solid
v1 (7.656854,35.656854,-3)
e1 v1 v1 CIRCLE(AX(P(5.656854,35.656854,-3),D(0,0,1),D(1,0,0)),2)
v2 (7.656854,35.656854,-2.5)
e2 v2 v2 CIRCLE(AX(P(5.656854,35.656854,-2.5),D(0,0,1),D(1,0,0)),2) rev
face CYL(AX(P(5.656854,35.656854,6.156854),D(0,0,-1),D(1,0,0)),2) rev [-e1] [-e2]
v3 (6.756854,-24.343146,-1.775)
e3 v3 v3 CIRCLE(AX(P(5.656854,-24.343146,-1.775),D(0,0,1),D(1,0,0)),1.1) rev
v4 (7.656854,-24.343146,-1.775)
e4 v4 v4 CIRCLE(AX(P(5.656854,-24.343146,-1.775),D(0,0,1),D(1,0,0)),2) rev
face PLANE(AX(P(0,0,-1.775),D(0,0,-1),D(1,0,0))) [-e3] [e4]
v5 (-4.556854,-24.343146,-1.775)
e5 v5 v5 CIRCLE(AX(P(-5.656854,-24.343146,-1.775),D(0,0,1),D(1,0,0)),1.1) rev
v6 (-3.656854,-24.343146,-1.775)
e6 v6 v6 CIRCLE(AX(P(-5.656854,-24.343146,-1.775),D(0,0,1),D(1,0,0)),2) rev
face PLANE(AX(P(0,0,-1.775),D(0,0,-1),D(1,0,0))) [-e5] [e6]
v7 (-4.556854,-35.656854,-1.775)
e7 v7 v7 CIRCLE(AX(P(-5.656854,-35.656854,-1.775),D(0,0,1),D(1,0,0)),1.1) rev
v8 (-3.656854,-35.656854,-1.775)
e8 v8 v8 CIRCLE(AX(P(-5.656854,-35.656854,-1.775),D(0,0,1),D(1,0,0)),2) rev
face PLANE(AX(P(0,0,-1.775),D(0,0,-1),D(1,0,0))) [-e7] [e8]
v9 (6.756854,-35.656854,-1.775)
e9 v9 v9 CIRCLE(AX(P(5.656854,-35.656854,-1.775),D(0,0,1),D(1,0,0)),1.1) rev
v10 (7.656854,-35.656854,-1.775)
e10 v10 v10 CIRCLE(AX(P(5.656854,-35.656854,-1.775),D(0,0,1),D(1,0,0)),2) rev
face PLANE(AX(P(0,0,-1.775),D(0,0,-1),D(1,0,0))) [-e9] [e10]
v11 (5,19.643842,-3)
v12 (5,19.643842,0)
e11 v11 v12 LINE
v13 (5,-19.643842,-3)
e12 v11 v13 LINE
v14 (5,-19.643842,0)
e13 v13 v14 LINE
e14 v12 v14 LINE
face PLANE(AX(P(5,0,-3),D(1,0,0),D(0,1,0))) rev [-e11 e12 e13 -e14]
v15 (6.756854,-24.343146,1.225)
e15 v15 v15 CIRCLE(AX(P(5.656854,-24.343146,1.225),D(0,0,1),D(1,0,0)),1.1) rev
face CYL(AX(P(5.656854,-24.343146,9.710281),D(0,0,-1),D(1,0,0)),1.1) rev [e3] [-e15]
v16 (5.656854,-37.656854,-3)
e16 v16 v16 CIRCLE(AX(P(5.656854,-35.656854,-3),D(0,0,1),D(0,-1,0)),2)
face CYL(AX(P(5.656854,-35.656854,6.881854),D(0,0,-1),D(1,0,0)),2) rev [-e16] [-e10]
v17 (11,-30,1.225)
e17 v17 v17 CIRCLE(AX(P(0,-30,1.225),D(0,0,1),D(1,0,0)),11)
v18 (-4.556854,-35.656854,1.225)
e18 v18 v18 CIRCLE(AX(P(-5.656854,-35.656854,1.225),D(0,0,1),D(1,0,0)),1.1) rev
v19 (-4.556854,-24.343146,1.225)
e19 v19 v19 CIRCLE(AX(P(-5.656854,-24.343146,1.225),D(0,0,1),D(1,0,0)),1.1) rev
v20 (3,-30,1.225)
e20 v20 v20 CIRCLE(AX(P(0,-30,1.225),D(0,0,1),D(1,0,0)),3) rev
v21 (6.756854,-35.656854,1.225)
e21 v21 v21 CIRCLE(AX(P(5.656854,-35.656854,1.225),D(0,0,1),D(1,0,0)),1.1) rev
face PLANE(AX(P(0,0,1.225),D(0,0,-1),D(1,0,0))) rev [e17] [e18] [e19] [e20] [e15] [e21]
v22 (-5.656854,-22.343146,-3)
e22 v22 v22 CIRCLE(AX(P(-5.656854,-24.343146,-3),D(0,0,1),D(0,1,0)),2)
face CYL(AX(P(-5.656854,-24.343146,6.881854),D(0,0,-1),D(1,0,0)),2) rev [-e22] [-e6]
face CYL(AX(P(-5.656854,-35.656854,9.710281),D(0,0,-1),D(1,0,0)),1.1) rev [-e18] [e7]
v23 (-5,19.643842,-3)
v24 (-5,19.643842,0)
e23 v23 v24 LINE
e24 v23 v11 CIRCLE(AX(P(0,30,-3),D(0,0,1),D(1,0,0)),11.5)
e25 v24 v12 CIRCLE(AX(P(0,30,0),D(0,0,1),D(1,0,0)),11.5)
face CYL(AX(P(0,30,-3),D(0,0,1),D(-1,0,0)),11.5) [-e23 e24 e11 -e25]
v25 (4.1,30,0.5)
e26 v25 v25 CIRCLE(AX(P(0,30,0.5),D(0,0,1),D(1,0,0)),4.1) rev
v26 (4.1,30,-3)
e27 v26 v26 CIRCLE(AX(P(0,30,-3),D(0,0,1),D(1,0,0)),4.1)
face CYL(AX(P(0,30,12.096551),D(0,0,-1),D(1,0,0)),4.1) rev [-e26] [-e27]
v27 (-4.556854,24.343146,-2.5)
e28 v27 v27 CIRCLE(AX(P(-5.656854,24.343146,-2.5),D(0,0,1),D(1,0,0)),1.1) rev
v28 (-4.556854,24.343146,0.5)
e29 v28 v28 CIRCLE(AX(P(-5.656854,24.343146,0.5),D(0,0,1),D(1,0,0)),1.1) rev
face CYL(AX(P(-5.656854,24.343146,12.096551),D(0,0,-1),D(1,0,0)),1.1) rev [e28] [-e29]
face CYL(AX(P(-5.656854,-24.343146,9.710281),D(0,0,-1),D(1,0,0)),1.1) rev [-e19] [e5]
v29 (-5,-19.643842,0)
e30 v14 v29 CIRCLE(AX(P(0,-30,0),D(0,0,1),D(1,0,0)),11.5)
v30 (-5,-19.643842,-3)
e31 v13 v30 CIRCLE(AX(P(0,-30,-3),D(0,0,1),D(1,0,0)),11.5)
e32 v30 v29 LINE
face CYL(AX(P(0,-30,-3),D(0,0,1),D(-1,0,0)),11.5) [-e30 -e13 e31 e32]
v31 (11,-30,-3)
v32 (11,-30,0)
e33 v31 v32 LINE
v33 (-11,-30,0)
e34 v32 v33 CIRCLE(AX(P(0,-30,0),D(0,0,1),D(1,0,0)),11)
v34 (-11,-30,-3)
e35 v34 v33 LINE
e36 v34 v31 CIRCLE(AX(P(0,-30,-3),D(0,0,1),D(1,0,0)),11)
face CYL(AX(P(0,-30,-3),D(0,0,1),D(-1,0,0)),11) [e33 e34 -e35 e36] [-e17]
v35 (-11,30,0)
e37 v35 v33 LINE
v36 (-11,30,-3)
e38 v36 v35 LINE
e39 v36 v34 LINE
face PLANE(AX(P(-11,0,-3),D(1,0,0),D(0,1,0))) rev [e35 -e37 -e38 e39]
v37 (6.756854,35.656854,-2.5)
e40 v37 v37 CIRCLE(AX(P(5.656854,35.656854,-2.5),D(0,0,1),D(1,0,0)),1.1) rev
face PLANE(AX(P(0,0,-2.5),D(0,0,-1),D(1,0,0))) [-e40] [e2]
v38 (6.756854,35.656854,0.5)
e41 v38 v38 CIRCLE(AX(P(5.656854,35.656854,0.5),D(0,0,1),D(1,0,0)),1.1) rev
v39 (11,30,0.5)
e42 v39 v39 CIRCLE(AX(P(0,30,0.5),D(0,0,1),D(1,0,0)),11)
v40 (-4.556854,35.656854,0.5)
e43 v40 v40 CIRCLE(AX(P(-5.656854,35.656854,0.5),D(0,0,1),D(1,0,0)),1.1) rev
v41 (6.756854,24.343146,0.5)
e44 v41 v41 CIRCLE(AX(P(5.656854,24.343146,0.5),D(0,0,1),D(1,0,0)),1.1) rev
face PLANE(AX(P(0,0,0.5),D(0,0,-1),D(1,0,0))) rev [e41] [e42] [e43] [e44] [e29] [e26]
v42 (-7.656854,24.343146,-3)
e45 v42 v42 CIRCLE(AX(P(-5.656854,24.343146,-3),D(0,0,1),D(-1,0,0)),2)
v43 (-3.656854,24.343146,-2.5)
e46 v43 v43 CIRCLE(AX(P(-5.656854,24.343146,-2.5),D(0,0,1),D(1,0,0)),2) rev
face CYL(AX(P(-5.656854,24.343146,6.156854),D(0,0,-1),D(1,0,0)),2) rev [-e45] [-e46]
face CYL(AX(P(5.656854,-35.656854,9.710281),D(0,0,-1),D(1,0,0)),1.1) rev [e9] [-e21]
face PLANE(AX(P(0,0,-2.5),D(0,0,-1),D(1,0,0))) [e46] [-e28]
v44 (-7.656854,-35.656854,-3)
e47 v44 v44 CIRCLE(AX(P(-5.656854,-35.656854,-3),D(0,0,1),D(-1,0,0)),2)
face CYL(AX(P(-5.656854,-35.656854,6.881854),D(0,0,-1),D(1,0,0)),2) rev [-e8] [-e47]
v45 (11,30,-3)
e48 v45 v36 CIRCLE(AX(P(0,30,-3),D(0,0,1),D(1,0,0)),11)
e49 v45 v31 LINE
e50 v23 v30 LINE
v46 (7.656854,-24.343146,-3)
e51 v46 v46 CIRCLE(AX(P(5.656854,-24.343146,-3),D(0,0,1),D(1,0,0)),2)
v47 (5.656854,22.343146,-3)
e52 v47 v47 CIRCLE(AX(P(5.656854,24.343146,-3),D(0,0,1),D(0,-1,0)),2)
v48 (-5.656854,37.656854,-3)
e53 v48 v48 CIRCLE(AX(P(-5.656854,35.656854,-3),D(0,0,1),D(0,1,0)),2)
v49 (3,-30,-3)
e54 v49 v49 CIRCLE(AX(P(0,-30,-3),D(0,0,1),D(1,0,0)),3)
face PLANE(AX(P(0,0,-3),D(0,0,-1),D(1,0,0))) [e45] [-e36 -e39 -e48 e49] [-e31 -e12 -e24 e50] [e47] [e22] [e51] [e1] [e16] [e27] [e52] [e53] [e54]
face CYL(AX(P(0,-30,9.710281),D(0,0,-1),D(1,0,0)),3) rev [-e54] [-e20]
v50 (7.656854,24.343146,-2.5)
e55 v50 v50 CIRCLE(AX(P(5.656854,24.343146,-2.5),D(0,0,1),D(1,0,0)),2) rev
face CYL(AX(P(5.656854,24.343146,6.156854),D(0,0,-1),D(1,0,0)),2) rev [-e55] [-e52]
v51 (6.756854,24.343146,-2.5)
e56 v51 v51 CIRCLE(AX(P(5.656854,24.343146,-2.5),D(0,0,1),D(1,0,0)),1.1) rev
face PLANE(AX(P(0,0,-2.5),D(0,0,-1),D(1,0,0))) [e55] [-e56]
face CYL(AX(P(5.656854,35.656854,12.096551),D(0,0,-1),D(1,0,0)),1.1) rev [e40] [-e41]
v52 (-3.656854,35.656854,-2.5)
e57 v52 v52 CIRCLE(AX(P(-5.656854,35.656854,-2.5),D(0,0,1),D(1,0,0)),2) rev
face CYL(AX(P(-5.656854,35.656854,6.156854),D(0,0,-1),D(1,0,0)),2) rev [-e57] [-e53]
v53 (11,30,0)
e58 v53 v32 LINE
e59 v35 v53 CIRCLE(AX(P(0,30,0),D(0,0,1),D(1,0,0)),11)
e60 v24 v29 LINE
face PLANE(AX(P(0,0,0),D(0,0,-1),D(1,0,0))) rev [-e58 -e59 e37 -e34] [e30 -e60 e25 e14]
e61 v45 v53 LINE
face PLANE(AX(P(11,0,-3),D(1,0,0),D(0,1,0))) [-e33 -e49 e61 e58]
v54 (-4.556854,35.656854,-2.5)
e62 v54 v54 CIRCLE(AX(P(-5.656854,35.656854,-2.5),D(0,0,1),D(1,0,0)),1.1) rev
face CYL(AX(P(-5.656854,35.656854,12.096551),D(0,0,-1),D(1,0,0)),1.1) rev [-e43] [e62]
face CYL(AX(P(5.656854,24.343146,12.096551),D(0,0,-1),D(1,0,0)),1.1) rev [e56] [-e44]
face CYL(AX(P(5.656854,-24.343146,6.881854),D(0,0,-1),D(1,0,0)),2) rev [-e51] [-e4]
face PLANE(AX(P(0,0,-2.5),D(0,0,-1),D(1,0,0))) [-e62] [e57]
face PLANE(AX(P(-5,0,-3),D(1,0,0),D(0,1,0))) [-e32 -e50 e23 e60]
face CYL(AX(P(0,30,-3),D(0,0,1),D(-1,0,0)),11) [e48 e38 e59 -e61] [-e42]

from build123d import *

# Parameters (mm, degrees)
BOSS_EXTRUDE1_DEPTH           = 3
BOSS_EXTRUDE2_START           = -0.5
SKETCH1_3_R                   = 11
BOSS_EXTRUDE2_DEPTH           = 0.5
SKETCH2_R                     = 4.1
SKETCH2_R_2                   = 1.1000000000000099
CUT_EXTRUDE1_DEPTH            = 3.5
SKETCH2_3_R                   = 2.000000000000007
CUT_EXTRUDE2_DEPTH            = 0.5
CIRPATTERN2_COUNT             = 4
BOSS_EXTRUDE3_START           = -1.225
SKETCH1_5_R                   = 11
BOSS_EXTRUDE3_DEPTH           = 1.225
SKETCH3_R                     = 3.0000000000000004
SKETCH3_R_2                   = 1.1
CUT_EXTRUDE3_DEPTH            = 4.225
SKETCH3_3_R                   = 2.0000000000000027
CUT_EXTRUDE4_DEPTH            = 1.225
CIRPATTERN3_COUNT             = 4
BODY_MOVE_COPY1_START         = -3
BODY_MOVE_COPY1_OUTLINE_R     = 2
BODY_MOVE_COPY1_OUTLINE_R_2   = 3
BODY_MOVE_COPY1_OUTLINE_R_3   = 4.1
BODY_MOVE_COPY1_DEPTH         = 3
BODY_MOVE_COPY1_START_2       = -2.5
BODY_MOVE_COPY1_2_OUTLINE_R   = 2
BODY_MOVE_COPY1_2_OUTLINE_R_2 = 1.1
BODY_MOVE_COPY1_2_DEPTH       = 2
BODY_MOVE_COPY1_START_3       = -1.775
BODY_MOVE_COPY1_3_OUTLINE_R   = 2
BODY_MOVE_COPY1_3_OUTLINE_R_2 = 1.1
BODY_MOVE_COPY1_3_DEPTH       = 0.55
BODY_MOVE_COPY1_START_4       = 0.5
BODY_MOVE_COPY1_4_OUTLINE_R   = 4.1
BODY_MOVE_COPY1_4_OUTLINE_R_2 = 1.1
BODY_MOVE_COPY1_4_DEPTH       = 2.5
BODY_MOVE_COPY1_START_5       = 1.225
BODY_MOVE_COPY1_5_OUTLINE_R   = 11
BODY_MOVE_COPY1_5_OUTLINE_R_2 = 3
BODY_MOVE_COPY1_5_OUTLINE_R_3 = 1.1
BODY_MOVE_COPY1_5_DEPTH       = 1.775
BODY_MOVE_COPY1_6_DEPTH       = 0.5


# Read off the part's stored shape, not the designer's step: Body-Move/Copy1
with BuildPart() as part:
    # Sketch1 → Boss-Extrude1 (new body)
    with BuildSketch(Plane.XY):
        with BuildLine():
            Line((-11.000000000000004, 30), (-11, -30))
            ThreePointArc((-11, -30), (-2.02e-15, -41), (11, -30.000000000000004))
            Line((11, -30), (10.999999999999996, 30))
            ThreePointArc((10.999999999999996, 30), (-5.6e-16, 41), (-11.000000000000004, 30.000000000000007))
        make_face()
        with BuildLine():
            ThreePointArc((4.999999999999998, -19.643842411396), (2.89e-15, -18.49999999999999), (-4.999999999999995, -19.643842411396))
            Line((-4.999999999999993, -19.643842411396008), (-5.0000000000000036, 19.643842411396008))
            ThreePointArc((-5.000000000000004, 19.643842411396008), (1.78e-15, 18.5), (5.000000000000006, 19.643842411396008))
            Line((5.0000000000000036, 19.643842411396008), (4.999999999999998, -19.643842411396008))
        make_face(mode=Mode.SUBTRACT)
    extrude(amount=BOSS_EXTRUDE1_DEPTH)

    # Sketch1<3> → Boss-Extrude2 (add)
    with BuildSketch(Plane.XY.offset(BOSS_EXTRUDE2_START)):
        with Locations((-3.67e-15, 30)):
            Circle(SKETCH1_3_R)
    extrude(amount=BOSS_EXTRUDE2_DEPTH)

    # Sketch2 → Cut-Extrude1 (cut)
    with BuildSketch(Plane.XY.offset(3)):
        with Locations((-3.67e-15, 30)):
            Circle(SKETCH2_R)
        with Locations((5.6568542494923415, 35.656854249492405)):
            Circle(SKETCH2_R_2)
    cut_extrude1 = extrude(amount=-CUT_EXTRUDE1_DEPTH, mode=Mode.SUBTRACT)

    # Sketch2<3> → Cut-Extrude2 (cut)
    with BuildSketch(Plane.XY.offset(3)):
        with Locations((5.6568542494923415, 35.656854249492405)):
            Circle(SKETCH2_3_R)
    cut_extrude2 = extrude(amount=-CUT_EXTRUDE2_DEPTH, mode=Mode.SUBTRACT)

    # CirPattern2: Cut-Extrude1, Cut-Extrude2 ×4 about axis
    cirpattern2_axis = Axis((-1.339e-14, 30.00000000000001, 0), (0, 0, 1))
    add([cut_extrude1.rotate(cirpattern2_axis, i * 360 / CIRPATTERN2_COUNT) for i in range(1, CIRPATTERN2_COUNT)], mode=Mode.SUBTRACT)
    add([cut_extrude2.rotate(cirpattern2_axis, i * 360 / CIRPATTERN2_COUNT) for i in range(1, CIRPATTERN2_COUNT)], mode=Mode.SUBTRACT)

    # Sketch1<5> → Boss-Extrude3 (add)
    with BuildSketch(Plane.XY.offset(BOSS_EXTRUDE3_START)):
        with Locations((0, -30)):
            Circle(SKETCH1_5_R)
    extrude(amount=BOSS_EXTRUDE3_DEPTH)

    # Sketch3 → Cut-Extrude3 (cut)
    with BuildSketch(Plane.XY.offset(3)):
        with Locations((0, -30)):
            Circle(SKETCH3_R)
        with Locations((5.656854249492389, -24.34314575050763)):
            Circle(SKETCH3_R_2)
    cut_extrude3 = extrude(amount=-CUT_EXTRUDE3_DEPTH, mode=Mode.SUBTRACT)

    # Sketch3<3> → Cut-Extrude4 (cut)
    with BuildSketch(Plane.XY.offset(3)):
        with Locations((5.656854249492389, -24.34314575050763)):
            Circle(SKETCH3_3_R)
    cut_extrude4 = extrude(amount=-CUT_EXTRUDE4_DEPTH, mode=Mode.SUBTRACT)

    # CirPattern3: Cut-Extrude3, Cut-Extrude4 ×4 about axis
    cirpattern3_axis = Axis((-9.49e-15, -29.99999999999999, 0), (0, 0, 1))
    add([cut_extrude3.rotate(cirpattern3_axis, i * 360 / CIRPATTERN3_COUNT) for i in range(1, CIRPATTERN3_COUNT)], mode=Mode.SUBTRACT)
    add([cut_extrude4.rotate(cirpattern3_axis, i * 360 / CIRPATTERN3_COUNT) for i in range(1, CIRPATTERN3_COUNT)], mode=Mode.SUBTRACT)

    # Body-Move/Copy1 outline → Body-Move/Copy1 (add)
    with BuildSketch(Plane.XY.offset(BODY_MOVE_COPY1_START)):
        with BuildLine():
            Line((-11, 30), (-11, -30))
            ThreePointArc((-11, -30), (0, -41), (11, -30))
            Line((11, -30), (11, 30))
            ThreePointArc((11, 30), (0, 41), (-11, 30))
        make_face()
        with BuildLine():
            Line((-5, -19.643842411), (-5, 19.643842411))
            ThreePointArc((-5, 19.643842411), (0, 18.5), (5, 19.643842411))
            Line((5, 19.643842411), (5, -19.643842411))
            ThreePointArc((5, -19.643842411), (0, -18.5), (-5, -19.643842411))
        make_face(mode=Mode.SUBTRACT)
        with Locations((5.656854249, -24.343145751)):
            Circle(BODY_MOVE_COPY1_OUTLINE_R, mode=Mode.SUBTRACT)
        with Locations((-5.656854249, -35.656854249)):
            Circle(BODY_MOVE_COPY1_OUTLINE_R, mode=Mode.SUBTRACT)
        with Locations((-5.656854249, -24.343145751)):
            Circle(BODY_MOVE_COPY1_OUTLINE_R, mode=Mode.SUBTRACT)
        with Locations((0, -30)):
            Circle(BODY_MOVE_COPY1_OUTLINE_R_2, mode=Mode.SUBTRACT)
        with Locations((5.656854249, -35.656854249)):
            Circle(BODY_MOVE_COPY1_OUTLINE_R, mode=Mode.SUBTRACT)
        with Locations((5.656854249, 35.656854249)):
            Circle(BODY_MOVE_COPY1_OUTLINE_R, mode=Mode.SUBTRACT)
        with Locations((-5.656854249, 24.343145751)):
            Circle(BODY_MOVE_COPY1_OUTLINE_R, mode=Mode.SUBTRACT)
        with Locations((-5.656854249, 35.656854249)):
            Circle(BODY_MOVE_COPY1_OUTLINE_R, mode=Mode.SUBTRACT)
        with Locations((0, 30)):
            Circle(BODY_MOVE_COPY1_OUTLINE_R_3, mode=Mode.SUBTRACT)
        with Locations((5.656854249, 24.343145751)):
            Circle(BODY_MOVE_COPY1_OUTLINE_R, mode=Mode.SUBTRACT)
    extrude(amount=BODY_MOVE_COPY1_DEPTH)

    # Body-Move_Copy1 2 outline → Body-Move_Copy1 2 (add)
    # profile 1 of 4: a face of its own
    with BuildSketch(Plane.XY.offset(BODY_MOVE_COPY1_START_2)):
        with Locations((5.656854249, 35.656854249)):
            Circle(BODY_MOVE_COPY1_2_OUTLINE_R)
        with Locations((5.656854249, 35.656854249)):
            Circle(BODY_MOVE_COPY1_2_OUTLINE_R_2, mode=Mode.SUBTRACT)
    # profile 2 of 4: a face of its own
    with BuildSketch(Plane.XY.offset(BODY_MOVE_COPY1_START_2)):
        with Locations((5.656854249, 24.343145751)):
            Circle(BODY_MOVE_COPY1_2_OUTLINE_R)
        with Locations((5.656854249, 24.343145751)):
            Circle(BODY_MOVE_COPY1_2_OUTLINE_R_2, mode=Mode.SUBTRACT)
    # profile 3 of 4: a face of its own
    with BuildSketch(Plane.XY.offset(BODY_MOVE_COPY1_START_2)):
        with Locations((-5.656854249, 35.656854249)):
            Circle(BODY_MOVE_COPY1_2_OUTLINE_R)
        with Locations((-5.656854249, 35.656854249)):
            Circle(BODY_MOVE_COPY1_2_OUTLINE_R_2, mode=Mode.SUBTRACT)
    # profile 4 of 4: a face of its own
    with BuildSketch(Plane.XY.offset(BODY_MOVE_COPY1_START_2)):
        with Locations((-5.656854249, 24.343145751)):
            Circle(BODY_MOVE_COPY1_2_OUTLINE_R)
        with Locations((-5.656854249, 24.343145751)):
            Circle(BODY_MOVE_COPY1_2_OUTLINE_R_2, mode=Mode.SUBTRACT)
    extrude(amount=BODY_MOVE_COPY1_2_DEPTH)

    # Body-Move_Copy1 3 outline → Body-Move_Copy1 3 (add)
    # profile 1 of 4: a face of its own
    with BuildSketch(Plane.XY.offset(BODY_MOVE_COPY1_START_3)):
        with Locations((5.656854249, -24.343145751)):
            Circle(BODY_MOVE_COPY1_3_OUTLINE_R)
        with Locations((5.656854249, -24.343145751)):
            Circle(BODY_MOVE_COPY1_3_OUTLINE_R_2, mode=Mode.SUBTRACT)
    # profile 2 of 4: a face of its own
    with BuildSketch(Plane.XY.offset(BODY_MOVE_COPY1_START_3)):
        with Locations((5.656854249, -35.656854249)):
            Circle(BODY_MOVE_COPY1_3_OUTLINE_R)
        with Locations((5.656854249, -35.656854249)):
            Circle(BODY_MOVE_COPY1_3_OUTLINE_R_2, mode=Mode.SUBTRACT)
    # profile 3 of 4: a face of its own
    with BuildSketch(Plane.XY.offset(BODY_MOVE_COPY1_START_3)):
        with Locations((-5.656854249, -24.343145751)):
            Circle(BODY_MOVE_COPY1_3_OUTLINE_R)
        with Locations((-5.656854249, -24.343145751)):
            Circle(BODY_MOVE_COPY1_3_OUTLINE_R_2, mode=Mode.SUBTRACT)
    # profile 4 of 4: a face of its own
    with BuildSketch(Plane.XY.offset(BODY_MOVE_COPY1_START_3)):
        with Locations((-5.656854249, -35.656854249)):
            Circle(BODY_MOVE_COPY1_3_OUTLINE_R)
        with Locations((-5.656854249, -35.656854249)):
            Circle(BODY_MOVE_COPY1_3_OUTLINE_R_2, mode=Mode.SUBTRACT)
    extrude(amount=BODY_MOVE_COPY1_3_DEPTH)

    # Body-Move_Copy1 4 outline → Body-Move_Copy1 4 (cut)
    with BuildSketch(Plane.XY.offset(BODY_MOVE_COPY1_START_4)):
        with BuildLine():
            ThreePointArc((-11, -30), (0, -19), (11, -30))
            Line((11, -30), (11, 30))
            ThreePointArc((11, 30), (0, 41), (-11, 30))
            Line((-11, 30), (-11, -30))
        make_face()
        with BuildLine():
            Line((-5, -19.643842411), (-5, 19.643842411))
            ThreePointArc((-5, 19.643842411), (0, 18.5), (5, 19.643842411))
            Line((5, 19.643842411), (5, -19.643842411))
            ThreePointArc((5, -19.643842411), (0, -18.5), (-5, -19.643842411))
        make_face(mode=Mode.SUBTRACT)
        with Locations((0, 30)):
            Circle(BODY_MOVE_COPY1_4_OUTLINE_R, mode=Mode.SUBTRACT)
        with Locations((5.656854249, 35.656854249)):
            Circle(BODY_MOVE_COPY1_4_OUTLINE_R_2, mode=Mode.SUBTRACT)
        with Locations((-5.656854249, 24.343145751)):
            Circle(BODY_MOVE_COPY1_4_OUTLINE_R_2, mode=Mode.SUBTRACT)
        with Locations((-5.656854249, 35.656854249)):
            Circle(BODY_MOVE_COPY1_4_OUTLINE_R_2, mode=Mode.SUBTRACT)
        with Locations((5.656854249, 24.343145751)):
            Circle(BODY_MOVE_COPY1_4_OUTLINE_R_2, mode=Mode.SUBTRACT)
    extrude(amount=BODY_MOVE_COPY1_4_DEPTH, mode=Mode.SUBTRACT)

    # Body-Move_Copy1 5 outline → Body-Move_Copy1 5 (cut)
    with BuildSketch(Plane.XY.offset(BODY_MOVE_COPY1_START_5)):
        with Locations((0, -30)):
            Circle(BODY_MOVE_COPY1_5_OUTLINE_R)
        with Locations((0, -30)):
            Circle(BODY_MOVE_COPY1_5_OUTLINE_R_2, mode=Mode.SUBTRACT)
        with Locations((-5.656854249, -35.656854249)):
            Circle(BODY_MOVE_COPY1_5_OUTLINE_R_3, mode=Mode.SUBTRACT)
        with Locations((-5.656854249, -24.343145751)):
            Circle(BODY_MOVE_COPY1_5_OUTLINE_R_3, mode=Mode.SUBTRACT)
        with Locations((5.656854249, -35.656854249)):
            Circle(BODY_MOVE_COPY1_5_OUTLINE_R_3, mode=Mode.SUBTRACT)
        with Locations((5.656854249, -24.343145751)):
            Circle(BODY_MOVE_COPY1_5_OUTLINE_R_3, mode=Mode.SUBTRACT)
    extrude(amount=BODY_MOVE_COPY1_5_DEPTH, mode=Mode.SUBTRACT)

    # Body-Move_Copy1 6 outline → Body-Move_Copy1 6 (cut)
    with BuildSketch(Plane.XY):
        with BuildLine():
            ThreePointArc((-11, -30), (0, -19), (11, -30))
            Line((11, -30), (11, 30))
            ThreePointArc((11, 30), (0, 19), (-11, 30))
            Line((-11, 30), (-11, -30))
        make_face()
        with BuildLine():
            Line((-5, -19.643842411), (-5, 19.643842411))
            ThreePointArc((-5, 19.643842411), (0, 18.5), (5, 19.643842411))
            Line((5, 19.643842411), (5, -19.643842411))
            ThreePointArc((5, -19.643842411), (0, -18.5), (-5, -19.643842411))
        make_face(mode=Mode.SUBTRACT)
    extrude(amount=BODY_MOVE_COPY1_6_DEPTH, mode=Mode.SUBTRACT)


solid = part.part
